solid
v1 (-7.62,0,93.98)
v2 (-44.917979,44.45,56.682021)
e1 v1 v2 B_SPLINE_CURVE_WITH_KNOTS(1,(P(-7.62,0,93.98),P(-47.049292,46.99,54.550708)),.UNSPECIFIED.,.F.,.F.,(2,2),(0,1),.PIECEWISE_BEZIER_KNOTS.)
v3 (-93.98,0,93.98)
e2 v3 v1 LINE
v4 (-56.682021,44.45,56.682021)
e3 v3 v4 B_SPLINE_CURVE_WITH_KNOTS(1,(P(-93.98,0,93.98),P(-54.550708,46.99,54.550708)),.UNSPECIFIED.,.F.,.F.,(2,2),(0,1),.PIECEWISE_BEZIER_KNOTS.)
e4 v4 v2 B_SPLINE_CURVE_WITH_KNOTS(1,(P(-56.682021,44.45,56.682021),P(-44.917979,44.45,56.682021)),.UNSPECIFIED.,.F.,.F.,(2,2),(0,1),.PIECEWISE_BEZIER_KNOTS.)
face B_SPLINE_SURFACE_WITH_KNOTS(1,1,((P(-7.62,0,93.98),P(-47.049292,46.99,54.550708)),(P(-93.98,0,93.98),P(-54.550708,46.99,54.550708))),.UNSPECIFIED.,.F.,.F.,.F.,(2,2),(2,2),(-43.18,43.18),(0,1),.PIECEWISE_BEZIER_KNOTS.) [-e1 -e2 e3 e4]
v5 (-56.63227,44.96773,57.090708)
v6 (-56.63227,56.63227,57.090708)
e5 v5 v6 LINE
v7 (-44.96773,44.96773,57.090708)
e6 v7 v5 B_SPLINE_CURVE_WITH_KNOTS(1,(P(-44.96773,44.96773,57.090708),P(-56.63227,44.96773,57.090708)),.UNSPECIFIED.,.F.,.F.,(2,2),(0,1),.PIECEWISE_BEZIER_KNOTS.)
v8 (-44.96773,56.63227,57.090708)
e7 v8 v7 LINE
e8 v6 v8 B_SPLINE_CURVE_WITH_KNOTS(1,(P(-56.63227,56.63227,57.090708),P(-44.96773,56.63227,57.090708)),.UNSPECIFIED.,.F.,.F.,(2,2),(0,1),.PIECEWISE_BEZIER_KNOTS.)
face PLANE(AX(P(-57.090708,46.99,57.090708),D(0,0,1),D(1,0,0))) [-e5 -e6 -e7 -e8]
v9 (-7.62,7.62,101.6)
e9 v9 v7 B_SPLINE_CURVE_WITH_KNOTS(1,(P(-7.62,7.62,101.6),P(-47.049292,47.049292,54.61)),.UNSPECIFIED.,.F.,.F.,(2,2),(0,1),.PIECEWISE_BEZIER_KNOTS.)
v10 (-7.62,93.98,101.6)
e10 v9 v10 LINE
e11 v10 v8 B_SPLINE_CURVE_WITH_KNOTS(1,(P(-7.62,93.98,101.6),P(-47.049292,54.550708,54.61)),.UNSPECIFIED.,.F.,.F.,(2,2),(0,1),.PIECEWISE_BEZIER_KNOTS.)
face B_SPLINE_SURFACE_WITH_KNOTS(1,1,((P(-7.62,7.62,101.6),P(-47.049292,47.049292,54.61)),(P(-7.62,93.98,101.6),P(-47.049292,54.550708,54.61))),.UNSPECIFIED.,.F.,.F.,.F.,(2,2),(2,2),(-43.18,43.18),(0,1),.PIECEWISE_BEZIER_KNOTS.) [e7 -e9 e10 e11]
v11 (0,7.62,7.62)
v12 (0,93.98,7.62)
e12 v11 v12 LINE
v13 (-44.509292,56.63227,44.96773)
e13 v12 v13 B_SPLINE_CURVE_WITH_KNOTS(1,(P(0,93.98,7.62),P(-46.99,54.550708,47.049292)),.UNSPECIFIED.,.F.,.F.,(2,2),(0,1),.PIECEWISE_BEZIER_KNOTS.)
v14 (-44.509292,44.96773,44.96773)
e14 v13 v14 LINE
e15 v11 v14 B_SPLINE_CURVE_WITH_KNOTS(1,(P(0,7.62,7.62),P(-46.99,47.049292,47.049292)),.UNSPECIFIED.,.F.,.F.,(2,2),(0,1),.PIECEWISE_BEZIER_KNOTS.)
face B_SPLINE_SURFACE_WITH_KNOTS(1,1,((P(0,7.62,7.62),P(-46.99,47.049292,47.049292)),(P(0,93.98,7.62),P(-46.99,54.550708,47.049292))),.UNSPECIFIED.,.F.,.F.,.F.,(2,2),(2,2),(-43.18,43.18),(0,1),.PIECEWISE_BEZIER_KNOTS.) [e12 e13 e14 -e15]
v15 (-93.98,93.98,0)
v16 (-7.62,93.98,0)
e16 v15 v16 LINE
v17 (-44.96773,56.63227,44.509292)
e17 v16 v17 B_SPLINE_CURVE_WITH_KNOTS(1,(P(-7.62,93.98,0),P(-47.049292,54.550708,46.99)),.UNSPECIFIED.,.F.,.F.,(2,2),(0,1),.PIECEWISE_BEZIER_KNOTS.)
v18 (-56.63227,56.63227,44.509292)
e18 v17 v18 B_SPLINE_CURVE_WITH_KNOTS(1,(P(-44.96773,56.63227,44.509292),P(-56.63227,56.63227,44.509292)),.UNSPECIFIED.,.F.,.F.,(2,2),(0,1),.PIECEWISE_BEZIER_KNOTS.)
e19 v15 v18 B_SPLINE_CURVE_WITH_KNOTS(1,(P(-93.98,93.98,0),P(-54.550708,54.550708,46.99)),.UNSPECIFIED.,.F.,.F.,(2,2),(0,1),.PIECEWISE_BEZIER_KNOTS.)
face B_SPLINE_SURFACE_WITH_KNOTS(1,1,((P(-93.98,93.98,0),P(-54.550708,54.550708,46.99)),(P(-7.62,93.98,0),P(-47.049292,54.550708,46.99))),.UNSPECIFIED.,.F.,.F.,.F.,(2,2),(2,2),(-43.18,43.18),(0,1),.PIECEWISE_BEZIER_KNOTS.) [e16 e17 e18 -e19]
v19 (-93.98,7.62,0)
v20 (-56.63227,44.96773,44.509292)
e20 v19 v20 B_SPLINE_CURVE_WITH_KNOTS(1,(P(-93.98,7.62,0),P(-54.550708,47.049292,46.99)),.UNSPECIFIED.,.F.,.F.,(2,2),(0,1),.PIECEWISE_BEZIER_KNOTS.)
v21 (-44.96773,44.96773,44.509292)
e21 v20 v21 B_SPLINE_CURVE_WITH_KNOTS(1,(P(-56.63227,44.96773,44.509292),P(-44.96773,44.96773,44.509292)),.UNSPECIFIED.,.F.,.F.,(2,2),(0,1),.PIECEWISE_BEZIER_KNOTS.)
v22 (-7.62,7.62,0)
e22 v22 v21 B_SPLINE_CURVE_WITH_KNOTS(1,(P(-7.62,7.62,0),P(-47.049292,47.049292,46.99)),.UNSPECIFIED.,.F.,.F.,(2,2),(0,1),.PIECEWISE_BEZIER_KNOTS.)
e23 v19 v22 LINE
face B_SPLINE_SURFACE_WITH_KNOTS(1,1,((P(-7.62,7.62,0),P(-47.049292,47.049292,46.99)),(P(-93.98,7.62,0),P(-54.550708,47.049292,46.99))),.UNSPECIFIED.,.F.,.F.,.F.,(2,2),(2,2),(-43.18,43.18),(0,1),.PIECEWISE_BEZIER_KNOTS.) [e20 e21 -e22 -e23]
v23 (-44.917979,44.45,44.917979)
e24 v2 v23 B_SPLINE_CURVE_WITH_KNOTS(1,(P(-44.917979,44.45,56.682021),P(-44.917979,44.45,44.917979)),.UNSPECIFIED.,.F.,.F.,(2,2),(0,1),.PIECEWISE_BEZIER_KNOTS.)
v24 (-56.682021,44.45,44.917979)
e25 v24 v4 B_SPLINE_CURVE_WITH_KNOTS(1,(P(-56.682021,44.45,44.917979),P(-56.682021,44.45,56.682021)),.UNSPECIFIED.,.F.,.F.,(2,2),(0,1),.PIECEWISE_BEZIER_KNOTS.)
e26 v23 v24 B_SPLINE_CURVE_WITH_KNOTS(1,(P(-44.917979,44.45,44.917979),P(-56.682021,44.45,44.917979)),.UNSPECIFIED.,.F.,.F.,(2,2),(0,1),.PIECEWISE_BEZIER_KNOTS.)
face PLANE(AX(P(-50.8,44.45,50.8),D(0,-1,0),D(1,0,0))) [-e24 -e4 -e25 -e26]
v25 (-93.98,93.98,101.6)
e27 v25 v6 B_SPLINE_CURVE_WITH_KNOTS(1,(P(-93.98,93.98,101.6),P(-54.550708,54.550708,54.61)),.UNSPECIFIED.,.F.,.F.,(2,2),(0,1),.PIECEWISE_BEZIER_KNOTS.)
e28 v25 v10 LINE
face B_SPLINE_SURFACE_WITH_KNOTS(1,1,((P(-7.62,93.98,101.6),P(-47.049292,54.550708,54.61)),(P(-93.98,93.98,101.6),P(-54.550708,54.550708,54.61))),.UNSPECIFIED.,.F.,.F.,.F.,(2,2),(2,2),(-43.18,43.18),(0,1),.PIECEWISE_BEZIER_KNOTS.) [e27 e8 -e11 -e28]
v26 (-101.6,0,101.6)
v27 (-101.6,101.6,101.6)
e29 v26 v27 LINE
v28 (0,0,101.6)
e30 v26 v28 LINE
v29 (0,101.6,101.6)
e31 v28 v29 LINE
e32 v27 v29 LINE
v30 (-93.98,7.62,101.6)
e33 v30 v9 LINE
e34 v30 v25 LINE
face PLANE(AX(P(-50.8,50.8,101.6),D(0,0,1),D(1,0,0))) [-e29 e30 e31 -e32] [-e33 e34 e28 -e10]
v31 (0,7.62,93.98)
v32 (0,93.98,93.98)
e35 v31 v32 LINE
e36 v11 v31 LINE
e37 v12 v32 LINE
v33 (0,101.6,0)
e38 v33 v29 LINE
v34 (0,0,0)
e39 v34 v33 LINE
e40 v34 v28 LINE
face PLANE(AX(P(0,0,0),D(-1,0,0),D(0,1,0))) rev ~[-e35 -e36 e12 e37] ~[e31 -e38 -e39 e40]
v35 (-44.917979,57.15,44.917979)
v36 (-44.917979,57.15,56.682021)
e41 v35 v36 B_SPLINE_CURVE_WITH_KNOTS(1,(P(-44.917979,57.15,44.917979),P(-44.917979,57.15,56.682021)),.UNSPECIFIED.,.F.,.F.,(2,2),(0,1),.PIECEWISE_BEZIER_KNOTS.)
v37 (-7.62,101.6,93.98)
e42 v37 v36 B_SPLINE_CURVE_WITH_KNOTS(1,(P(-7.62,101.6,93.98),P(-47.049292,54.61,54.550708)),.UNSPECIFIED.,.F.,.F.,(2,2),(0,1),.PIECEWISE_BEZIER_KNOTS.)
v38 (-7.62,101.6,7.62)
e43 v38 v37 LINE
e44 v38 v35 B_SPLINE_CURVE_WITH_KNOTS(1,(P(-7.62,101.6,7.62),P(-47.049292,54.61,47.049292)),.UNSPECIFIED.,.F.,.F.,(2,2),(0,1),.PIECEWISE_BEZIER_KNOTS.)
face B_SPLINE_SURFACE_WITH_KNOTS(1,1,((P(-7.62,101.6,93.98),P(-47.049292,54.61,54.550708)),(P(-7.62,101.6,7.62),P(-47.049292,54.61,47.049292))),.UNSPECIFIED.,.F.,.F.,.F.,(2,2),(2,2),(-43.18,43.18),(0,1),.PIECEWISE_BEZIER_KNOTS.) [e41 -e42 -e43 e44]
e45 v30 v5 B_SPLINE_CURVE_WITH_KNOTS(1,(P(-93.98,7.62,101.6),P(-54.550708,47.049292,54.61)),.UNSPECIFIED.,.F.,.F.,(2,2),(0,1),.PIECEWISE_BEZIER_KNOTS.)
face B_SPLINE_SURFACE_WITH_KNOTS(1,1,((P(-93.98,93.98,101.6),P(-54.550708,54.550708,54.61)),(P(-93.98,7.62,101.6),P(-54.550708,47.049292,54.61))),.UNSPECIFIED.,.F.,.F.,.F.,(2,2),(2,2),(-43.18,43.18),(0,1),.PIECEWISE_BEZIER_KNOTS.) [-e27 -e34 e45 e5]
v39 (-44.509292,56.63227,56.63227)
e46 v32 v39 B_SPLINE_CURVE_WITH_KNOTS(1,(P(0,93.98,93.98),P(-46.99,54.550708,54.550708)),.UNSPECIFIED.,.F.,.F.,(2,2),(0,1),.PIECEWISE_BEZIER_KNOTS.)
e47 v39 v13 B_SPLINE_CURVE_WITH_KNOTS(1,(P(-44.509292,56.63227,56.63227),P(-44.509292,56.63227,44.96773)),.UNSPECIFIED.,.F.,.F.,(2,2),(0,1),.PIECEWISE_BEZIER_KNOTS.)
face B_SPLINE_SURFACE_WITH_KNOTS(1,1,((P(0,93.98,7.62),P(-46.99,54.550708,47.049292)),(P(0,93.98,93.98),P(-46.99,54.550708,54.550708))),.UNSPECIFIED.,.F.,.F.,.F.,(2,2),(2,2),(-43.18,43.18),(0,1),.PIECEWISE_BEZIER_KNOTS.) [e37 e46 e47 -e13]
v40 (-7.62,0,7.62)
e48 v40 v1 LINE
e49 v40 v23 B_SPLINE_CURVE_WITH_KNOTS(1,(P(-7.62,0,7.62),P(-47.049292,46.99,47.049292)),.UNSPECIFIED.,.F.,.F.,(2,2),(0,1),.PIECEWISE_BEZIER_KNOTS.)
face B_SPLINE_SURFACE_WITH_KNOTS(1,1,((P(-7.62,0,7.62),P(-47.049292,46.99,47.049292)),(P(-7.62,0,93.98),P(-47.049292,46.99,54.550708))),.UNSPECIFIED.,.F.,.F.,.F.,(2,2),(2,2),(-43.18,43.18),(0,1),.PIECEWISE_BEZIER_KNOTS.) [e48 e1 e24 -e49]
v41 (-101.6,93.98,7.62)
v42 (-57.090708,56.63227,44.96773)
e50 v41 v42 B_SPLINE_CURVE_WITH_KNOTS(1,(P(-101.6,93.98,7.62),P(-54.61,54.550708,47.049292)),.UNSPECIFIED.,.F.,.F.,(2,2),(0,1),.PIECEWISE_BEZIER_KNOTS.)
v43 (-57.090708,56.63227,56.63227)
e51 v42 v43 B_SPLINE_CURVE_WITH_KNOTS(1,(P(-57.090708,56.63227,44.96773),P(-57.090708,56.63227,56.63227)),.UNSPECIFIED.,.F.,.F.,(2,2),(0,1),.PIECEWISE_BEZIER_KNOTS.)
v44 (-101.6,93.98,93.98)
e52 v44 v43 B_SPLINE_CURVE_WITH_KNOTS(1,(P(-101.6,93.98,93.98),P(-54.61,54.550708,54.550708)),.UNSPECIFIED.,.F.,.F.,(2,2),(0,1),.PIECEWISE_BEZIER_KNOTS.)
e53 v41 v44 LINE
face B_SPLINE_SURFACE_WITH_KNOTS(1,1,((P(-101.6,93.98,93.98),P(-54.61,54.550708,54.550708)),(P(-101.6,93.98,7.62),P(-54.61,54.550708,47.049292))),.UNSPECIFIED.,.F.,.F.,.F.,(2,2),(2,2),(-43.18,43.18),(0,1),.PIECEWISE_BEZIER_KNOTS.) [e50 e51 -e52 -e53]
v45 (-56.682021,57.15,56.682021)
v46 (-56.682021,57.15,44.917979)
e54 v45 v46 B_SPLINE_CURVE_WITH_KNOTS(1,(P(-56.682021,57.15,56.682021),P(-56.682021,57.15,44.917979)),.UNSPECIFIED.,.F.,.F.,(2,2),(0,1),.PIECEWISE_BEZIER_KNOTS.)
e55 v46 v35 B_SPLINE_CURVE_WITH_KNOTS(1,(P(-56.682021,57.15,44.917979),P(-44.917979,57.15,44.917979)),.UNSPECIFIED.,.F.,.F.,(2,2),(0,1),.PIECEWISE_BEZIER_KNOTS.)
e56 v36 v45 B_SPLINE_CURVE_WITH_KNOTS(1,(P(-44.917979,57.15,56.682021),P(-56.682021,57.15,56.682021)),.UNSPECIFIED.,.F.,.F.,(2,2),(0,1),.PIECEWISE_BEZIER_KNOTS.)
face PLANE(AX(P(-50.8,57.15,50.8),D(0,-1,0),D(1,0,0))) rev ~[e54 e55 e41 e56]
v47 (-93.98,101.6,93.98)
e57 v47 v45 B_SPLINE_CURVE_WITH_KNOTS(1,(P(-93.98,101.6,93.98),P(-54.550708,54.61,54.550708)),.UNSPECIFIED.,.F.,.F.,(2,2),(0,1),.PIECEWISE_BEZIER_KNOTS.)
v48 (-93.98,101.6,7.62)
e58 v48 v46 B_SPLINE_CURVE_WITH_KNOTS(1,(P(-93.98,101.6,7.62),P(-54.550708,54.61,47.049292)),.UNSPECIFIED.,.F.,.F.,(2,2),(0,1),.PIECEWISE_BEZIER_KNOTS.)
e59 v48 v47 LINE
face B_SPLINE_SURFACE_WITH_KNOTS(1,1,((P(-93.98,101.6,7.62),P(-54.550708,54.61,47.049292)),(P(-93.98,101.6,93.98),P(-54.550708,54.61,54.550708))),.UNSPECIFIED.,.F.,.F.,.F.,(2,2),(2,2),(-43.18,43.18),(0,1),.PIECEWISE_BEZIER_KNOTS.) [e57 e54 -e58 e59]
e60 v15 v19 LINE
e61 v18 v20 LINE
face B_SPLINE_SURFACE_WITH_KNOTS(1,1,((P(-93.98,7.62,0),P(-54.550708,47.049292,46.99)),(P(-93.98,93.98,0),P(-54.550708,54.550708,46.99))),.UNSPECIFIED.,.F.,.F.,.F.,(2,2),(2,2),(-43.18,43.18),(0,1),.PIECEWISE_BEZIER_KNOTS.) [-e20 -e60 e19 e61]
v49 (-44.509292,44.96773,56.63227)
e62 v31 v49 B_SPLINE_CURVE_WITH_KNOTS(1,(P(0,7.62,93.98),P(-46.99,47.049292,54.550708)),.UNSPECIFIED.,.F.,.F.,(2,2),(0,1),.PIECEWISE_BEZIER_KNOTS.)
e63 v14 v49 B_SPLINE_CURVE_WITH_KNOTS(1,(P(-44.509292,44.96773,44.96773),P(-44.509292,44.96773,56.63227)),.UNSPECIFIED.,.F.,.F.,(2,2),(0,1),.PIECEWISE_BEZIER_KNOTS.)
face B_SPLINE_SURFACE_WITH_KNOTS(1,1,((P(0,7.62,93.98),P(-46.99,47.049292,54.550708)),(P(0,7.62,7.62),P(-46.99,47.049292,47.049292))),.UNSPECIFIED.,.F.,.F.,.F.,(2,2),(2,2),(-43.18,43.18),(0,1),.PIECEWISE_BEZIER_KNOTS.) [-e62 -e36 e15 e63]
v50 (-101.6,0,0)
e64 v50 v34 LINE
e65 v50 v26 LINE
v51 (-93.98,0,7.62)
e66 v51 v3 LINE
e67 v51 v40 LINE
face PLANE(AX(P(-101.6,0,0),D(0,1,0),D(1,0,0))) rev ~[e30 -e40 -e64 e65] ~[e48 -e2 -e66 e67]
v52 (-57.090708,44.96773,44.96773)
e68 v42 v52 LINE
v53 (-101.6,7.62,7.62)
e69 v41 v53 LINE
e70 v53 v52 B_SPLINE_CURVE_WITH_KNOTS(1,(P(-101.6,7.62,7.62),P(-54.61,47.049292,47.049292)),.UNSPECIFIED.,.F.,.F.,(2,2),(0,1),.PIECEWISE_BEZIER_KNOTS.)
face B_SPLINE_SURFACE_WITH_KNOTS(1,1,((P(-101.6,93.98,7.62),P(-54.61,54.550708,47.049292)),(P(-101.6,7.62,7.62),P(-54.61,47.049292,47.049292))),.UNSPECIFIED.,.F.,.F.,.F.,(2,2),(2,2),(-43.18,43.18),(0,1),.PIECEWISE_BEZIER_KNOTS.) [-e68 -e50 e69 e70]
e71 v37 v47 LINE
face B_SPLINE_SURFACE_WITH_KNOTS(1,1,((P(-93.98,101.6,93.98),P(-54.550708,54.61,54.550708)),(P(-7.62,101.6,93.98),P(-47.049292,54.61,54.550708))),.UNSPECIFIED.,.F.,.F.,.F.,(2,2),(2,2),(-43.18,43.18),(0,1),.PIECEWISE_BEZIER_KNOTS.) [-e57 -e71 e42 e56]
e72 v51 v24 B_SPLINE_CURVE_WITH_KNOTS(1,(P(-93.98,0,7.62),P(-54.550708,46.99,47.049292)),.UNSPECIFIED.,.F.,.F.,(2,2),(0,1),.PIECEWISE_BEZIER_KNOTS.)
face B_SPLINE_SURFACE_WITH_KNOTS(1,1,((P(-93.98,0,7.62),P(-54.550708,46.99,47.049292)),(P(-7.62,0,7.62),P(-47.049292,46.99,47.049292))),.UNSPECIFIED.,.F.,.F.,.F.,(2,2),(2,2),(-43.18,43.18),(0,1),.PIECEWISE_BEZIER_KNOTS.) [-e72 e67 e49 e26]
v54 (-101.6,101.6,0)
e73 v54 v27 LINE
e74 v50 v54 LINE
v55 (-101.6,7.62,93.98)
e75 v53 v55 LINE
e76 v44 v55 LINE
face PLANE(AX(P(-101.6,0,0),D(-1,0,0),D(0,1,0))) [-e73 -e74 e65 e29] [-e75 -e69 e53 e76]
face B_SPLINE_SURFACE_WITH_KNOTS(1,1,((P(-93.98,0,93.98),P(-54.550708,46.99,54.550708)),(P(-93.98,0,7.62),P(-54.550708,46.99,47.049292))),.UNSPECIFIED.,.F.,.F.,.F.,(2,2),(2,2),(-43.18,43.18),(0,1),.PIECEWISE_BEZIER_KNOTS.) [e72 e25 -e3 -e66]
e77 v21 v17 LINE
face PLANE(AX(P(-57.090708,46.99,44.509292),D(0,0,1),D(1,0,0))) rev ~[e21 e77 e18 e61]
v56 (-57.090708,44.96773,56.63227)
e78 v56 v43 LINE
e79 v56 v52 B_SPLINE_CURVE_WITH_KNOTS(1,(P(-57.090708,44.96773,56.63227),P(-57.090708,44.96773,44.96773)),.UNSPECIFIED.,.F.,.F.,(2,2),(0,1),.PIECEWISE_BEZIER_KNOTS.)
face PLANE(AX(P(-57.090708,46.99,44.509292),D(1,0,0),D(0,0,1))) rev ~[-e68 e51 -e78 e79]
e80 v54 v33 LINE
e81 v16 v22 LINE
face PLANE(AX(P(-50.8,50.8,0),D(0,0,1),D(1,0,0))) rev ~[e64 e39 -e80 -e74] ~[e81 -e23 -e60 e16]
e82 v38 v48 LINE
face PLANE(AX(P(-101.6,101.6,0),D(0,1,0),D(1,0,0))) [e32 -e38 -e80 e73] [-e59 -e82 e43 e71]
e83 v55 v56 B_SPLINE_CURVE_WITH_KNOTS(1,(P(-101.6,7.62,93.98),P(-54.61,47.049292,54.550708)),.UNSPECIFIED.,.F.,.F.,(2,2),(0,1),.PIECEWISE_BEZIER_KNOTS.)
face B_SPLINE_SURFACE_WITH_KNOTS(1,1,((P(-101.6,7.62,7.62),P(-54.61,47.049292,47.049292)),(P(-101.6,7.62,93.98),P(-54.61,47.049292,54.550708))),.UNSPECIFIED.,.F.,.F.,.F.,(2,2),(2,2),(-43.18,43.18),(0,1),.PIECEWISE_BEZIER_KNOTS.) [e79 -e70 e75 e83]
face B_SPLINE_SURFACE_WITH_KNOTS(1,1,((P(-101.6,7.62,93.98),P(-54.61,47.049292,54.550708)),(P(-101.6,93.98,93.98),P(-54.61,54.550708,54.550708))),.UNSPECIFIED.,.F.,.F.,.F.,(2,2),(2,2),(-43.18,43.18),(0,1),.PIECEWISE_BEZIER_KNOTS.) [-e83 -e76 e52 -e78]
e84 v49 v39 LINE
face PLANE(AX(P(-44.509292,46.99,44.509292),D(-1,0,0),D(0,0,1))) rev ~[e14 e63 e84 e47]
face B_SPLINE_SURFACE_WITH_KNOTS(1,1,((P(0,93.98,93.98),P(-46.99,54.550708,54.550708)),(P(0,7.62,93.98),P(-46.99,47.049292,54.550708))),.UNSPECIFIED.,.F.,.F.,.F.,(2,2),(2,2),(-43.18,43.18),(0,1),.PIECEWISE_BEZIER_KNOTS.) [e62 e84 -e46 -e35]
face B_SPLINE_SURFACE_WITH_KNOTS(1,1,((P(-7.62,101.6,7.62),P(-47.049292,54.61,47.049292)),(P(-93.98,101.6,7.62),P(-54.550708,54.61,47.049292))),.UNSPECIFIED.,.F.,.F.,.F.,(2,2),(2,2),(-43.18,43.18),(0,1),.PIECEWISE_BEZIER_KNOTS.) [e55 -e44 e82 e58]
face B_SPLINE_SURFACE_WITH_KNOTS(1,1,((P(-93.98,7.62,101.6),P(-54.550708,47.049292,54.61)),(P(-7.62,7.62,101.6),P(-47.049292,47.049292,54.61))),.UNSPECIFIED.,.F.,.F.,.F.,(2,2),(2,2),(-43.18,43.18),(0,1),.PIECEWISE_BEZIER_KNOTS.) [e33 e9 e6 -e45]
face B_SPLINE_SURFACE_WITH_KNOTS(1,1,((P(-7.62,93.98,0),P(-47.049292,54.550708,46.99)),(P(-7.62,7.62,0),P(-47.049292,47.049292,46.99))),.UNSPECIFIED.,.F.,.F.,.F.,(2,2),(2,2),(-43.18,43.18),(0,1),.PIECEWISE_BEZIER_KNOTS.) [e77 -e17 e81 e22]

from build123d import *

# Parameters (mm, degrees)
F0_W           = 101.6
F0_H           = 101.6
F1_DEPTH       = 101.6
F2_W           = 86.36
F2_H           = 86.36
F3_DEPTH       = 46.99
F3_TAPER       = 40
F4_W           = 86.36
F4_H           = 86.36
F5_DEPTH       = 46.99
F5_TAPER       = 40
F6_W           = 86.36
F6_H           = 86.36
F7_DEPTH       = 46.99
F7_TAPER       = 40
F8_W           = 86.36
F8_H           = 86.36
F9_DEPTH       = 46.99
F9_TAPER       = 40
F10_W          = 86.36
F10_H          = 86.36
F11_DEPTH      = 46.99
F11_TAPER      = 40
F12_W          = 86.36
F12_H          = 86.36
F13_DEPTH      = 46.99
F13_TAPER      = 40
F14_W          = 12.581416662
F14_H          = 12.581416662
F15_DEPTH      = 2.54
F15_DEPTH_BACK = 10.16


with BuildPart() as f1:
    # F0 (on Top) → F1 (new body)
    with BuildSketch(Plane.XY):
        with Locations((-50.8, 50.8)):
            Rectangle(F0_W, F0_H)
    extrude(amount=F1_DEPTH)

    # F2 (on face) → F3 (cut)
    with BuildSketch(Plane.XZ):
        with Locations((-50.8, 50.8)):
            Rectangle(F2_W, F2_H)
    extrude(amount=-F3_DEPTH, taper=F3_TAPER, mode=Mode.SUBTRACT)

    # F4 (on face) → F5 (cut)
    with BuildSketch(Plane.YZ):
        with Locations((50.8, 50.8)):
            Rectangle(F4_W, F4_H)
    extrude(amount=-F5_DEPTH, taper=F5_TAPER, mode=Mode.SUBTRACT)

    # F6 (on face) → F7 (cut)
    with BuildSketch(Plane.XY.offset(101.6)):
        with Locations((-50.8, 50.8)):
            Rectangle(F6_W, F6_H)
    extrude(amount=-F7_DEPTH, taper=F7_TAPER, mode=Mode.SUBTRACT)

    # F8 (on face) → F9 (cut)
    with BuildSketch(Plane(origin=(-101.6, 0, 0), x_dir=(0, -1, 0), z_dir=(-1, 0, 0))):
        with Locations((-50.8, 50.8)):
            Rectangle(F8_W, F8_H)
    extrude(amount=-F9_DEPTH, taper=F9_TAPER, mode=Mode.SUBTRACT)

    # F10 (on face) → F11 (cut)
    with BuildSketch(Plane(origin=(0, 101.6, 0), x_dir=(-1, 0, 0), z_dir=(0, 1, 0))):
        with Locations((50.8, 50.8)):
            Rectangle(F10_W, F10_H)
    extrude(amount=-F11_DEPTH, taper=F11_TAPER, mode=Mode.SUBTRACT)

    # F12 (on face) → F13 (cut)
    with BuildSketch(Plane(origin=(0, 0, 0), x_dir=(1, 0, 0), z_dir=(0, 0, -1))):
        with Locations((-50.8, -50.8)):
            Rectangle(F12_W, F12_H)
    extrude(amount=-F13_DEPTH, taper=F13_TAPER, mode=Mode.SUBTRACT)

    # F14 (on face) → F15 (join, two sides)
    with BuildSketch(Plane.XZ.offset(-46.99)) as f15_sk:
        with Locations((-50.8, 50.8)):
            Rectangle(F14_W, F14_H)
    extrude(amount=F15_DEPTH)
    extrude(f15_sk.sketch, amount=-F15_DEPTH_BACK)


solid = f1.part
